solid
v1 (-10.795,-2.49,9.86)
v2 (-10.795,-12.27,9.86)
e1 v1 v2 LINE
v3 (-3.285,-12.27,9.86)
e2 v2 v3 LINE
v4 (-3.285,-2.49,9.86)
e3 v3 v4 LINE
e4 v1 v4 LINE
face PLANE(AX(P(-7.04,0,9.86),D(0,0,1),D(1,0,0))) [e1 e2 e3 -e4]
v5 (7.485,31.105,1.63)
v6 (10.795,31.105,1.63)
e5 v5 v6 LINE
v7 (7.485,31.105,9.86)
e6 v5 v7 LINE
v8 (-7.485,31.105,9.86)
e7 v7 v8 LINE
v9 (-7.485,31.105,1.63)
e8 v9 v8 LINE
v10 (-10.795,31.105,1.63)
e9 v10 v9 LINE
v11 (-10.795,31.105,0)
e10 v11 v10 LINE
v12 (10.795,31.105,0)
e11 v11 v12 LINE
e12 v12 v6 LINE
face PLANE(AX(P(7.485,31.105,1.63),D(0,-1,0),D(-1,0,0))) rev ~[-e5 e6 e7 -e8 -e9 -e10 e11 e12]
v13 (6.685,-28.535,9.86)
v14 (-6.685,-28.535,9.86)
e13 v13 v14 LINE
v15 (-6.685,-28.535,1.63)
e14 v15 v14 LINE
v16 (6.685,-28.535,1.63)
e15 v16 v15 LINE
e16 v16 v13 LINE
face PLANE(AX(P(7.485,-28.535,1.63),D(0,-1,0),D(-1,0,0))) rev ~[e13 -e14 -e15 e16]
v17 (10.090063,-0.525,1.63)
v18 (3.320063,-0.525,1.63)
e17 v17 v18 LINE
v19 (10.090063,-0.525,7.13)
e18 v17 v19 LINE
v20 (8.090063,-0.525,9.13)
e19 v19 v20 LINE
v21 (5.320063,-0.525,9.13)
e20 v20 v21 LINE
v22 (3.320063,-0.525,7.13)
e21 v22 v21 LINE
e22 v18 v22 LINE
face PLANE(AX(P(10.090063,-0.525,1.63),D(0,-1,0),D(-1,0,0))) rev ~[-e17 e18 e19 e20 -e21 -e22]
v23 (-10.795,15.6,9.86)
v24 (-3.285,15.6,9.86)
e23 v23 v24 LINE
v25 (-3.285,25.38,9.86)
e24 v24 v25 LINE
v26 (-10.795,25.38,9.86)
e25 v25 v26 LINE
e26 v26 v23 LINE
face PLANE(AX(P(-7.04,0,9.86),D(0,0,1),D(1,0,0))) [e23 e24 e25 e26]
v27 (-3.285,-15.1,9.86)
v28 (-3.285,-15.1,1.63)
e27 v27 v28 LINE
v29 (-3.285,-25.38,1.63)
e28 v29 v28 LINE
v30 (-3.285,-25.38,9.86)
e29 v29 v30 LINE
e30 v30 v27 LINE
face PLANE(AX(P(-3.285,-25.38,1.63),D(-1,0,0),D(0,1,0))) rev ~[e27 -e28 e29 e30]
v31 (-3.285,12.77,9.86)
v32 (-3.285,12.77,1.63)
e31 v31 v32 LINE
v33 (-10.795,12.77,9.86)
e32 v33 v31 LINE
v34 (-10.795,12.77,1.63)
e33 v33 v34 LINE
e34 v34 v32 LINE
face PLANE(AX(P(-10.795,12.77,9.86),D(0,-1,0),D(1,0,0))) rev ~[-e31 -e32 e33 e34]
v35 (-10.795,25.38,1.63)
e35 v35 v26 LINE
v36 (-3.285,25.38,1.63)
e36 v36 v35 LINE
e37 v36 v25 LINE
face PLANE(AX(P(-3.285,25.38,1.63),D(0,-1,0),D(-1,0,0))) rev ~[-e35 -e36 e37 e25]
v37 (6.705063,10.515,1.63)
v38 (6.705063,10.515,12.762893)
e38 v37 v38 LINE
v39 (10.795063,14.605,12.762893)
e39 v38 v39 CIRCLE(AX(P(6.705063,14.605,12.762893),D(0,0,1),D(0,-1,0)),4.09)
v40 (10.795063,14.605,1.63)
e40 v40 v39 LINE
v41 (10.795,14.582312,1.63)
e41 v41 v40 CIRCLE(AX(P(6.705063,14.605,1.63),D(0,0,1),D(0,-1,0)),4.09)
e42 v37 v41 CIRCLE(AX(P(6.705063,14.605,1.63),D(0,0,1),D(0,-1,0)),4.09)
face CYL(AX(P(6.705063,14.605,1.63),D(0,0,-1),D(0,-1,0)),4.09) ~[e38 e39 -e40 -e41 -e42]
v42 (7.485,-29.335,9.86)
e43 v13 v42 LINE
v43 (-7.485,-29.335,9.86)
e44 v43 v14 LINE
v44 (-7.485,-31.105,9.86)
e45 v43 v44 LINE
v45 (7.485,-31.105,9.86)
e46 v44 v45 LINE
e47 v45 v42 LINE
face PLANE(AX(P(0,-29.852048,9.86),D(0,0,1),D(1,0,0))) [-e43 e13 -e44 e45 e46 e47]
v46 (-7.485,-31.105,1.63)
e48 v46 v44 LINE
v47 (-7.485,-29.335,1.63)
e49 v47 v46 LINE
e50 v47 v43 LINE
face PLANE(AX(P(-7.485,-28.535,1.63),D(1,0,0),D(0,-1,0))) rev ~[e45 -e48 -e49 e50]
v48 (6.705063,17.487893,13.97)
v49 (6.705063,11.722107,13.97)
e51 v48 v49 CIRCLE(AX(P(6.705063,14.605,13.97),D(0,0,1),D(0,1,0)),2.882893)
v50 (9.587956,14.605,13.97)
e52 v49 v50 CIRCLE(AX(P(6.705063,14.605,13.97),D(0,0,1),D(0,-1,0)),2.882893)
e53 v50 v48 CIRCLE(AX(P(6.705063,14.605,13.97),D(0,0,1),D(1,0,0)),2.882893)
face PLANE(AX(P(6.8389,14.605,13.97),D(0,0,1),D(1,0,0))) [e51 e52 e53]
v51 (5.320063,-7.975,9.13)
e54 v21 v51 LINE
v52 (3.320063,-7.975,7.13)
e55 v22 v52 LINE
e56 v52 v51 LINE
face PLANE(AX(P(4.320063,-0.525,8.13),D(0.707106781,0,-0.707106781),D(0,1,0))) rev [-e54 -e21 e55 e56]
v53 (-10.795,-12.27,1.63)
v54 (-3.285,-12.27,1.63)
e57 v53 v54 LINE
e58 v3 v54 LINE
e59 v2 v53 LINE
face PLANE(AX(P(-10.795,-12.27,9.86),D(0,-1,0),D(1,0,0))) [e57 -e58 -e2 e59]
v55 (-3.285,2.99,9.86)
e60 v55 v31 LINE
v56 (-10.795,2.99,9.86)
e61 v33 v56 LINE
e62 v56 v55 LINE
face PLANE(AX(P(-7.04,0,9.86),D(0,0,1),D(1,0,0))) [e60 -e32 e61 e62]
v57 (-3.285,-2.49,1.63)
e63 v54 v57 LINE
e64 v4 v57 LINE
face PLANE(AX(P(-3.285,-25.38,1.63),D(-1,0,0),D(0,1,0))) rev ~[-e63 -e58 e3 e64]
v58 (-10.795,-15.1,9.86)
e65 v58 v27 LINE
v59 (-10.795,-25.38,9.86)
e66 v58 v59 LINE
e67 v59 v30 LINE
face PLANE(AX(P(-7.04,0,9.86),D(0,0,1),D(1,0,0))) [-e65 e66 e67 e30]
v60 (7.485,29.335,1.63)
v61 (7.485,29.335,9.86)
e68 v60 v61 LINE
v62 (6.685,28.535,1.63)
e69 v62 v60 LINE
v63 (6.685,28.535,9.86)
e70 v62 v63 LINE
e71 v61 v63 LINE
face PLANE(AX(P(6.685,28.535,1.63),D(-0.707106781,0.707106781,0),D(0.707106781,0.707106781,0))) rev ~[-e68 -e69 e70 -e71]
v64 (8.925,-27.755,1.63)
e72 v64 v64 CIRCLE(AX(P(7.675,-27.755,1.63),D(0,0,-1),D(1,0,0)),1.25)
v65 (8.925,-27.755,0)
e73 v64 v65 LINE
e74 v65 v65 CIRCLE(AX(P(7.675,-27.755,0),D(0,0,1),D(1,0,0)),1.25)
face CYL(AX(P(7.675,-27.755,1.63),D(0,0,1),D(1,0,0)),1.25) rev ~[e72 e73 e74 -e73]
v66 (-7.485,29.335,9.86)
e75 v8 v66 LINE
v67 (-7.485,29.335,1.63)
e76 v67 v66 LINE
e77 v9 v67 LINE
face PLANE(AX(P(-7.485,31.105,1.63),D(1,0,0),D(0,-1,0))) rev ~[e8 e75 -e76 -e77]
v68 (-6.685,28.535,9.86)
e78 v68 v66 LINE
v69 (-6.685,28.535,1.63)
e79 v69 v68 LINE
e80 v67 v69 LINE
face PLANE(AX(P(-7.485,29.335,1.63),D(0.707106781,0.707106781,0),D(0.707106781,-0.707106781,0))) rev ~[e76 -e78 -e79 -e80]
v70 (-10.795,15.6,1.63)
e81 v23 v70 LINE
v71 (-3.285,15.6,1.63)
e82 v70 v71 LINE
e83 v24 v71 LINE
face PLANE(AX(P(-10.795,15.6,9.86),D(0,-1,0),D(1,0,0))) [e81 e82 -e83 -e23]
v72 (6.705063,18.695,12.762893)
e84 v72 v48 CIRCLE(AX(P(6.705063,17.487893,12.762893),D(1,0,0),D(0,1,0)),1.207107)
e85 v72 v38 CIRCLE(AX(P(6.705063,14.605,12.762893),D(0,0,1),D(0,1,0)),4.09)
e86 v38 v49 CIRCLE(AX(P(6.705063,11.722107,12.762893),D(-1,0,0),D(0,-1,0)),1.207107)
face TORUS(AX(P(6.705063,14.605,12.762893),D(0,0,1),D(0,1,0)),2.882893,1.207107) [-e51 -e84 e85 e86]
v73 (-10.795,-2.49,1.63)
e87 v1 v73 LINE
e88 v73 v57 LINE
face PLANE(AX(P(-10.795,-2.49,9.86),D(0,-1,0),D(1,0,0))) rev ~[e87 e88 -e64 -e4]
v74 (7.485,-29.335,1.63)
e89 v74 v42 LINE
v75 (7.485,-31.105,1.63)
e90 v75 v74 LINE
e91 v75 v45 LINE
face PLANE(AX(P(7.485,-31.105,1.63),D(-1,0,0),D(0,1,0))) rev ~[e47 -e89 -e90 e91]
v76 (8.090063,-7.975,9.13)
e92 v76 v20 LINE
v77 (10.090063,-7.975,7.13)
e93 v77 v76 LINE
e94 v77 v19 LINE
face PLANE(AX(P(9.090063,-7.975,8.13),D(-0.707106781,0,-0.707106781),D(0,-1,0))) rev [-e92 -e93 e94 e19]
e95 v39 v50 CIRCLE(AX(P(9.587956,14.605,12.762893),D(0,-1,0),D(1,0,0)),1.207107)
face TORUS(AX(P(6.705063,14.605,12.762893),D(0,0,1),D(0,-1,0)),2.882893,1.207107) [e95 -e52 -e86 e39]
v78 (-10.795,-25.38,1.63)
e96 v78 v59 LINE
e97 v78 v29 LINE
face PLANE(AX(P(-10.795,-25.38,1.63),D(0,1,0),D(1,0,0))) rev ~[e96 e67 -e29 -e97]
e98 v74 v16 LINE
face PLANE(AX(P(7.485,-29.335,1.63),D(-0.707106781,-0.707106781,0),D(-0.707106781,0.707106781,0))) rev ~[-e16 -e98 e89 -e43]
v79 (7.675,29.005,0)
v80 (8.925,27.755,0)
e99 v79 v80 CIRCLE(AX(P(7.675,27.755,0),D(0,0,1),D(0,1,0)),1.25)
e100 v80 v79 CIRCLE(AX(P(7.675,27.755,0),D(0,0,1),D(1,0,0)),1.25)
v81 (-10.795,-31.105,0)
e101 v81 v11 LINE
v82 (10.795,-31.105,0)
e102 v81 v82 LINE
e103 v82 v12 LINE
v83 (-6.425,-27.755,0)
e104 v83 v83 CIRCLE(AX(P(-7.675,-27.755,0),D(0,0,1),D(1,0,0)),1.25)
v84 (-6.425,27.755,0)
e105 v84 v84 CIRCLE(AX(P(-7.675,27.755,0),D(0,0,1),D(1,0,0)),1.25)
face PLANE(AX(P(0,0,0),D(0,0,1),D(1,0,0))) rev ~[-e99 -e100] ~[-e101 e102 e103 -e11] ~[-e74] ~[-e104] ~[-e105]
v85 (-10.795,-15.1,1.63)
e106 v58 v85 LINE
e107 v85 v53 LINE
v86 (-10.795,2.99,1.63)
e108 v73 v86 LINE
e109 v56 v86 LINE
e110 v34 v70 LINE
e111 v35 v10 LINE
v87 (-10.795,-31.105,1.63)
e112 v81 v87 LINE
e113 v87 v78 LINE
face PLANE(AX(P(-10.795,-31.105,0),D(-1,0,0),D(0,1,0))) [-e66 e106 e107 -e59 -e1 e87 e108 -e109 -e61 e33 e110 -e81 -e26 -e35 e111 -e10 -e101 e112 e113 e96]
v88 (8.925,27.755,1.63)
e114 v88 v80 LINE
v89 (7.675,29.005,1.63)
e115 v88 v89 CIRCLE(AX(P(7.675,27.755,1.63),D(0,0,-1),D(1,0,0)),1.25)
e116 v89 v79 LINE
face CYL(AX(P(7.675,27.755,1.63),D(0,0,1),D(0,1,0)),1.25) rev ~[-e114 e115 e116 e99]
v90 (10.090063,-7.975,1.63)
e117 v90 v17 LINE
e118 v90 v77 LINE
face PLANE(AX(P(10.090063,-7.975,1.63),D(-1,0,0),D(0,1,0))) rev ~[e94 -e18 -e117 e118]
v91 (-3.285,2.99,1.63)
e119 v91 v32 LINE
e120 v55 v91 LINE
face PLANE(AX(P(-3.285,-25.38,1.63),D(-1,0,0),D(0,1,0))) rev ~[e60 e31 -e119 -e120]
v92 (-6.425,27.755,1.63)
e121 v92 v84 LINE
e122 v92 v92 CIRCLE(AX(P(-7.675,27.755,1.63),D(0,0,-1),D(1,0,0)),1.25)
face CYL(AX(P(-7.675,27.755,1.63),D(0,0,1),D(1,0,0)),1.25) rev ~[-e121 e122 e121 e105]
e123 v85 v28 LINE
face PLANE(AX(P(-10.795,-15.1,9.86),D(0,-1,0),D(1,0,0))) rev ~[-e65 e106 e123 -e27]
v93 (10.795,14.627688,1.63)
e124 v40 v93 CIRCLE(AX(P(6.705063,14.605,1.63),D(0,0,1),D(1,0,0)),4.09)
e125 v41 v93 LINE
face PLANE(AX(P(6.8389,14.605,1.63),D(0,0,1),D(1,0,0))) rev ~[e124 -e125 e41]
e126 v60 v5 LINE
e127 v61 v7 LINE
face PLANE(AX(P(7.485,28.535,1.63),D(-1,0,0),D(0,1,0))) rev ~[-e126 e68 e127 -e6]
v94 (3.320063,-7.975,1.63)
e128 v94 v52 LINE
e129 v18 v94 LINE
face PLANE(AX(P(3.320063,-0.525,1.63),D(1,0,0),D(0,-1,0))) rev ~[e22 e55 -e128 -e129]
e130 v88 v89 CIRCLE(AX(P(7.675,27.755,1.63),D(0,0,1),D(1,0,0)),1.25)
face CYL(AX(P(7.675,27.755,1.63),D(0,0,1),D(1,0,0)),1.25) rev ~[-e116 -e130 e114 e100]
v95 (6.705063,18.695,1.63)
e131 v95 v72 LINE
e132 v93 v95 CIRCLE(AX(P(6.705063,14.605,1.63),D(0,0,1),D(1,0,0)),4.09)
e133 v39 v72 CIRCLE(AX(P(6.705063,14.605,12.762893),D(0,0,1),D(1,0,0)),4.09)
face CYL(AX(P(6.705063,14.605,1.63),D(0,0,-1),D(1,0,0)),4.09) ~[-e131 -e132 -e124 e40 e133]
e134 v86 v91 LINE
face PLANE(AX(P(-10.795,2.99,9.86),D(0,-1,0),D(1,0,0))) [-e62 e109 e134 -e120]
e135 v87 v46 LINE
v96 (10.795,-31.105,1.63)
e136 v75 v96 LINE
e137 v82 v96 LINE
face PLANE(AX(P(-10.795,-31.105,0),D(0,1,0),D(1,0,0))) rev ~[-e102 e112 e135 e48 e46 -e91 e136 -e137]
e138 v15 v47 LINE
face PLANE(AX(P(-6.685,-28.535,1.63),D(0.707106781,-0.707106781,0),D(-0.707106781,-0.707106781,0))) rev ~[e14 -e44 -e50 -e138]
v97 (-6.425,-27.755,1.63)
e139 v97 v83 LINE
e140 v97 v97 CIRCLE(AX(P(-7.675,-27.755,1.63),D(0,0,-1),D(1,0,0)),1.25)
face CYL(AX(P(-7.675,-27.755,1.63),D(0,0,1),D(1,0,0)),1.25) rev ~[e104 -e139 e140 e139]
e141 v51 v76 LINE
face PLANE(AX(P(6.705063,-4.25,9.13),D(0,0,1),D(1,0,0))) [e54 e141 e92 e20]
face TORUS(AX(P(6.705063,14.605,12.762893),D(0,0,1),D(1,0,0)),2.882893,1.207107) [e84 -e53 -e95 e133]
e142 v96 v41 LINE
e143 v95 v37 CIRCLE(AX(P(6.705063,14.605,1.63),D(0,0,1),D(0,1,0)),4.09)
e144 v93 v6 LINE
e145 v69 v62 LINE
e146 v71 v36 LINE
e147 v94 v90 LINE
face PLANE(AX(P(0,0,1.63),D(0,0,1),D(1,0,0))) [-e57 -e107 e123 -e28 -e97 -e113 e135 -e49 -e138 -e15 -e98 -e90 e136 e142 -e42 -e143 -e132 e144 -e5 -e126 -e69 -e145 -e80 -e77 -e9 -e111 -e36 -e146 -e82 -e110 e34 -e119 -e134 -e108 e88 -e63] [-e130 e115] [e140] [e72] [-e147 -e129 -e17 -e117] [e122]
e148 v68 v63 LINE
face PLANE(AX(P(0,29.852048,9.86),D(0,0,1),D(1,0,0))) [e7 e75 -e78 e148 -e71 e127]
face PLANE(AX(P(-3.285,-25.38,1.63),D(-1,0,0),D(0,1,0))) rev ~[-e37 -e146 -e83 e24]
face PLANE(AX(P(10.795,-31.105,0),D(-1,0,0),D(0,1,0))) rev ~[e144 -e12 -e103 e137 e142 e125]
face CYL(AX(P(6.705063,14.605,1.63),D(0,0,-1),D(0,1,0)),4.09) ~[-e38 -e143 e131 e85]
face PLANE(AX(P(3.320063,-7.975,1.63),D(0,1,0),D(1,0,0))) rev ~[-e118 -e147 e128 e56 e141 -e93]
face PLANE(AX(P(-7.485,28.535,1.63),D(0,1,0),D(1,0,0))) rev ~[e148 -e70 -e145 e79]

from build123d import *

# Parameters (mm, degrees)
F0_W         = 21.59
F0_H         = 62.21
F1_DEPTH     = 1.63
F4_DEPTH     = 12.34
F5_DEPTH     = 7.5
F2_R         = 1.25
F6_DEPTH     = 25
F7_SIZE      = 2
F8_R         = 1.2071067812
F10_DEPTH    = 8.23
F12_DEPTH    = 8.23
F13_T1_DEPTH = 10.2873463904
F14_W        = 7.51
F14_H        = 2.83
F14_H_2      = 5.48
F15_DEPTH    = 8.23


# Not quite as in the source:
# - a fillet or chamfer that OpenCascade refuses, or shapes differently, is made with other operations: its cross-section is extruded or revolved along the edge and cut away or added


with BuildPart() as f1:
    # F0 (on Top) → F1 (new body)
    with BuildSketch(Plane.XY):
        Rectangle(F0_W, F0_H)
    extrude(amount=F1_DEPTH)

    # F3 (on face) → F4 (join)
    with BuildSketch(Plane.XY.offset(1.63)):
        with BuildLine():
            ThreePointArc((10.7950629295, 14.605), (9.5971296646, 17.4970667351), (6.7050629295, 18.695))
            ThreePointArc((6.7050629295, 18.695), (2.6150629295, 14.605), (6.7050629295, 10.515))
            ThreePointArc((6.7050629295, 10.515), (9.5971296646, 11.7129332649), (10.7950629295, 14.605))
        make_face()
    extrude(amount=F4_DEPTH)

    # F3 (on face) → F5 (join)
    with BuildSketch(Plane.XY.offset(1.63)):
        Polygon((10.0900629295, -0.525), (6.7050629295, -0.525), (3.3200629295, -0.525), (3.3200629295, -7.975), (10.0900629295, -7.975), align=None)
    extrude(amount=F5_DEPTH)

    # F2 (on face) → F6 (cut)
    with BuildSketch(Plane.XY.offset(1.63)):
        with BuildLine():
            ThreePointArc((7.675, 29.005), (6.7911165235, 26.8711165235), (8.925, 27.755))
            Line((8.925, 27.755), (7.675, 27.755))
            Line((7.675, 27.755), (7.675, 29.005))
        make_face()
        with BuildLine():
            Line((7.675, 27.755), (8.925, 27.755))
            ThreePointArc((8.925, 27.755), (8.5588834765, 28.6388834765), (7.675, 29.005))
            Line((7.675, 29.005), (7.675, 27.755))
        make_face()
        with Locations((-7.675, 27.755)):
            Circle(F2_R)
        with Locations((-7.675, -27.755)):
            Circle(F2_R)
        with Locations((7.675, -27.755)):
            Circle(F2_R)
    extrude(amount=-F6_DEPTH, mode=Mode.SUBTRACT)

    # F7
    f7_edges = [f1.edges().sort_by_distance(p)[0] for p in [
        (3.320063, -4.25, 9.13),
        (10.090063, -4.25, 9.13),
    ]]
    chamfer(f7_edges, length=F7_SIZE)

    # F8
    f8_edges = [f1.edges().sort_by_distance(p)[0] for p in [
        (6.705063, 18.695, 13.97),
    ]]
    fillet(f8_edges, radius=F8_R)

    # F9 (on face) → F10 (join)
    with BuildSketch(Plane.XY.offset(1.63)):
        Polygon((-10.795, 25.38), (-10.795, 0), (-10.795, -25.38), (-3.285, -25.38), (-3.285, 25.38), align=None)
    extrude(amount=F10_DEPTH)

    # F11 (on face) → F12 (join)
    with BuildSketch(Plane.XY.offset(1.63)):
        with BuildLine():
            Line((7.485, 31.105), (0, 31.105))
            Line((0, 31.105), (-7.485, 31.105))
            Line((-7.485, 31.105), (-7.485, 28.9904756169))
            ThreePointArc((-7.485, 28.9904756169), (-7.0487343616, 28.8368000509), (-6.6982195743, 28.535))
            Line((-6.6982195743, 28.535), (6.6982195743, 28.535))
            ThreePointArc((6.6982195743, 28.535), (7.0487343616, 28.8368000509), (7.485, 28.9904756169))
            Line((7.485, 28.9904756169), (7.485, 31.105))
        make_face()
        with BuildLine():
            Line((7.485, 28.535), (7.485, 28.9904756169))
            ThreePointArc((7.485, 28.9904756169), (7.0487343616, 28.8368000509), (6.6982195743, 28.535))
            Line((6.6982195743, 28.535), (7.485, 28.535))
        make_face()
        with BuildLine():
            ThreePointArc((-6.6982195743, 28.535), (-7.0487343616, 28.8368000509), (-7.485, 28.9904756169))
            Line((-7.485, 28.9904756169), (-7.485, 28.535))
            Line((-7.485, 28.535), (-6.6982195743, 28.535))
        make_face()
        with BuildLine():
            Line((0, -31.105), (7.485, -31.105))
            Line((7.485, -31.105), (7.485, -28.9904756169))
            ThreePointArc((7.485, -28.9904756169), (7.0487343616, -28.8368000509), (6.6982195743, -28.535))
            Line((6.6982195743, -28.535), (-6.6982195743, -28.535))
            ThreePointArc((-6.6982195743, -28.535), (-7.0487343616, -28.8368000509), (-7.485, -28.9904756169))
            Line((-7.485, -28.9904756169), (-7.485, -31.105))
            Line((-7.485, -31.105), (0, -31.105))
        make_face()
        with BuildLine():
            ThreePointArc((6.6982195743, -28.535), (7.0487343616, -28.8368000509), (7.485, -28.9904756169))
            Line((7.485, -28.9904756169), (7.485, -28.535))
            Line((7.485, -28.535), (6.6982195743, -28.535))
        make_face()
        with BuildLine():
            Line((-7.485, -28.535), (-7.485, -28.9904756169))
            ThreePointArc((-7.485, -28.9904756169), (-7.0487343616, -28.8368000509), (-6.6982195743, -28.535))
            Line((-6.6982195743, -28.535), (-7.485, -28.535))
        make_face()
    extrude(amount=F12_DEPTH)

    # F13: chamfer of 0.8 on 4 edges, made by hand

    # F13_s2 → F13_t1 (cut)
    with BuildSketch(Plane.XY.offset(1.63)):
        Polygon((-7.485, 29.335), (-6.685, 28.535), (-7.485, 28.535), align=None)
        Polygon((6.685, 28.535), (7.485, 29.335), (7.485, 28.535), align=None)
        Polygon((-6.685, -28.535), (-7.485, -29.335), (-7.485, -28.535), align=None)
        Polygon((7.485, -29.335), (6.685, -28.535), (7.485, -28.535), align=None)
    extrude(amount=F13_T1_DEPTH, mode=Mode.SUBTRACT)

    # F14 (on face) → F15 (cut)
    with BuildSketch(Plane.XY.offset(9.86)):
        with Locations((-7.04, 14.185)):
            Rectangle(F14_W, F14_H)
        with Locations((-7.04, 0.25)):
            Rectangle(F14_W, F14_H_2)
        with Locations((-7.04, -13.685)):
            Rectangle(F14_W, F14_H)
    extrude(amount=-F15_DEPTH, mode=Mode.SUBTRACT)


solid = f1.part
